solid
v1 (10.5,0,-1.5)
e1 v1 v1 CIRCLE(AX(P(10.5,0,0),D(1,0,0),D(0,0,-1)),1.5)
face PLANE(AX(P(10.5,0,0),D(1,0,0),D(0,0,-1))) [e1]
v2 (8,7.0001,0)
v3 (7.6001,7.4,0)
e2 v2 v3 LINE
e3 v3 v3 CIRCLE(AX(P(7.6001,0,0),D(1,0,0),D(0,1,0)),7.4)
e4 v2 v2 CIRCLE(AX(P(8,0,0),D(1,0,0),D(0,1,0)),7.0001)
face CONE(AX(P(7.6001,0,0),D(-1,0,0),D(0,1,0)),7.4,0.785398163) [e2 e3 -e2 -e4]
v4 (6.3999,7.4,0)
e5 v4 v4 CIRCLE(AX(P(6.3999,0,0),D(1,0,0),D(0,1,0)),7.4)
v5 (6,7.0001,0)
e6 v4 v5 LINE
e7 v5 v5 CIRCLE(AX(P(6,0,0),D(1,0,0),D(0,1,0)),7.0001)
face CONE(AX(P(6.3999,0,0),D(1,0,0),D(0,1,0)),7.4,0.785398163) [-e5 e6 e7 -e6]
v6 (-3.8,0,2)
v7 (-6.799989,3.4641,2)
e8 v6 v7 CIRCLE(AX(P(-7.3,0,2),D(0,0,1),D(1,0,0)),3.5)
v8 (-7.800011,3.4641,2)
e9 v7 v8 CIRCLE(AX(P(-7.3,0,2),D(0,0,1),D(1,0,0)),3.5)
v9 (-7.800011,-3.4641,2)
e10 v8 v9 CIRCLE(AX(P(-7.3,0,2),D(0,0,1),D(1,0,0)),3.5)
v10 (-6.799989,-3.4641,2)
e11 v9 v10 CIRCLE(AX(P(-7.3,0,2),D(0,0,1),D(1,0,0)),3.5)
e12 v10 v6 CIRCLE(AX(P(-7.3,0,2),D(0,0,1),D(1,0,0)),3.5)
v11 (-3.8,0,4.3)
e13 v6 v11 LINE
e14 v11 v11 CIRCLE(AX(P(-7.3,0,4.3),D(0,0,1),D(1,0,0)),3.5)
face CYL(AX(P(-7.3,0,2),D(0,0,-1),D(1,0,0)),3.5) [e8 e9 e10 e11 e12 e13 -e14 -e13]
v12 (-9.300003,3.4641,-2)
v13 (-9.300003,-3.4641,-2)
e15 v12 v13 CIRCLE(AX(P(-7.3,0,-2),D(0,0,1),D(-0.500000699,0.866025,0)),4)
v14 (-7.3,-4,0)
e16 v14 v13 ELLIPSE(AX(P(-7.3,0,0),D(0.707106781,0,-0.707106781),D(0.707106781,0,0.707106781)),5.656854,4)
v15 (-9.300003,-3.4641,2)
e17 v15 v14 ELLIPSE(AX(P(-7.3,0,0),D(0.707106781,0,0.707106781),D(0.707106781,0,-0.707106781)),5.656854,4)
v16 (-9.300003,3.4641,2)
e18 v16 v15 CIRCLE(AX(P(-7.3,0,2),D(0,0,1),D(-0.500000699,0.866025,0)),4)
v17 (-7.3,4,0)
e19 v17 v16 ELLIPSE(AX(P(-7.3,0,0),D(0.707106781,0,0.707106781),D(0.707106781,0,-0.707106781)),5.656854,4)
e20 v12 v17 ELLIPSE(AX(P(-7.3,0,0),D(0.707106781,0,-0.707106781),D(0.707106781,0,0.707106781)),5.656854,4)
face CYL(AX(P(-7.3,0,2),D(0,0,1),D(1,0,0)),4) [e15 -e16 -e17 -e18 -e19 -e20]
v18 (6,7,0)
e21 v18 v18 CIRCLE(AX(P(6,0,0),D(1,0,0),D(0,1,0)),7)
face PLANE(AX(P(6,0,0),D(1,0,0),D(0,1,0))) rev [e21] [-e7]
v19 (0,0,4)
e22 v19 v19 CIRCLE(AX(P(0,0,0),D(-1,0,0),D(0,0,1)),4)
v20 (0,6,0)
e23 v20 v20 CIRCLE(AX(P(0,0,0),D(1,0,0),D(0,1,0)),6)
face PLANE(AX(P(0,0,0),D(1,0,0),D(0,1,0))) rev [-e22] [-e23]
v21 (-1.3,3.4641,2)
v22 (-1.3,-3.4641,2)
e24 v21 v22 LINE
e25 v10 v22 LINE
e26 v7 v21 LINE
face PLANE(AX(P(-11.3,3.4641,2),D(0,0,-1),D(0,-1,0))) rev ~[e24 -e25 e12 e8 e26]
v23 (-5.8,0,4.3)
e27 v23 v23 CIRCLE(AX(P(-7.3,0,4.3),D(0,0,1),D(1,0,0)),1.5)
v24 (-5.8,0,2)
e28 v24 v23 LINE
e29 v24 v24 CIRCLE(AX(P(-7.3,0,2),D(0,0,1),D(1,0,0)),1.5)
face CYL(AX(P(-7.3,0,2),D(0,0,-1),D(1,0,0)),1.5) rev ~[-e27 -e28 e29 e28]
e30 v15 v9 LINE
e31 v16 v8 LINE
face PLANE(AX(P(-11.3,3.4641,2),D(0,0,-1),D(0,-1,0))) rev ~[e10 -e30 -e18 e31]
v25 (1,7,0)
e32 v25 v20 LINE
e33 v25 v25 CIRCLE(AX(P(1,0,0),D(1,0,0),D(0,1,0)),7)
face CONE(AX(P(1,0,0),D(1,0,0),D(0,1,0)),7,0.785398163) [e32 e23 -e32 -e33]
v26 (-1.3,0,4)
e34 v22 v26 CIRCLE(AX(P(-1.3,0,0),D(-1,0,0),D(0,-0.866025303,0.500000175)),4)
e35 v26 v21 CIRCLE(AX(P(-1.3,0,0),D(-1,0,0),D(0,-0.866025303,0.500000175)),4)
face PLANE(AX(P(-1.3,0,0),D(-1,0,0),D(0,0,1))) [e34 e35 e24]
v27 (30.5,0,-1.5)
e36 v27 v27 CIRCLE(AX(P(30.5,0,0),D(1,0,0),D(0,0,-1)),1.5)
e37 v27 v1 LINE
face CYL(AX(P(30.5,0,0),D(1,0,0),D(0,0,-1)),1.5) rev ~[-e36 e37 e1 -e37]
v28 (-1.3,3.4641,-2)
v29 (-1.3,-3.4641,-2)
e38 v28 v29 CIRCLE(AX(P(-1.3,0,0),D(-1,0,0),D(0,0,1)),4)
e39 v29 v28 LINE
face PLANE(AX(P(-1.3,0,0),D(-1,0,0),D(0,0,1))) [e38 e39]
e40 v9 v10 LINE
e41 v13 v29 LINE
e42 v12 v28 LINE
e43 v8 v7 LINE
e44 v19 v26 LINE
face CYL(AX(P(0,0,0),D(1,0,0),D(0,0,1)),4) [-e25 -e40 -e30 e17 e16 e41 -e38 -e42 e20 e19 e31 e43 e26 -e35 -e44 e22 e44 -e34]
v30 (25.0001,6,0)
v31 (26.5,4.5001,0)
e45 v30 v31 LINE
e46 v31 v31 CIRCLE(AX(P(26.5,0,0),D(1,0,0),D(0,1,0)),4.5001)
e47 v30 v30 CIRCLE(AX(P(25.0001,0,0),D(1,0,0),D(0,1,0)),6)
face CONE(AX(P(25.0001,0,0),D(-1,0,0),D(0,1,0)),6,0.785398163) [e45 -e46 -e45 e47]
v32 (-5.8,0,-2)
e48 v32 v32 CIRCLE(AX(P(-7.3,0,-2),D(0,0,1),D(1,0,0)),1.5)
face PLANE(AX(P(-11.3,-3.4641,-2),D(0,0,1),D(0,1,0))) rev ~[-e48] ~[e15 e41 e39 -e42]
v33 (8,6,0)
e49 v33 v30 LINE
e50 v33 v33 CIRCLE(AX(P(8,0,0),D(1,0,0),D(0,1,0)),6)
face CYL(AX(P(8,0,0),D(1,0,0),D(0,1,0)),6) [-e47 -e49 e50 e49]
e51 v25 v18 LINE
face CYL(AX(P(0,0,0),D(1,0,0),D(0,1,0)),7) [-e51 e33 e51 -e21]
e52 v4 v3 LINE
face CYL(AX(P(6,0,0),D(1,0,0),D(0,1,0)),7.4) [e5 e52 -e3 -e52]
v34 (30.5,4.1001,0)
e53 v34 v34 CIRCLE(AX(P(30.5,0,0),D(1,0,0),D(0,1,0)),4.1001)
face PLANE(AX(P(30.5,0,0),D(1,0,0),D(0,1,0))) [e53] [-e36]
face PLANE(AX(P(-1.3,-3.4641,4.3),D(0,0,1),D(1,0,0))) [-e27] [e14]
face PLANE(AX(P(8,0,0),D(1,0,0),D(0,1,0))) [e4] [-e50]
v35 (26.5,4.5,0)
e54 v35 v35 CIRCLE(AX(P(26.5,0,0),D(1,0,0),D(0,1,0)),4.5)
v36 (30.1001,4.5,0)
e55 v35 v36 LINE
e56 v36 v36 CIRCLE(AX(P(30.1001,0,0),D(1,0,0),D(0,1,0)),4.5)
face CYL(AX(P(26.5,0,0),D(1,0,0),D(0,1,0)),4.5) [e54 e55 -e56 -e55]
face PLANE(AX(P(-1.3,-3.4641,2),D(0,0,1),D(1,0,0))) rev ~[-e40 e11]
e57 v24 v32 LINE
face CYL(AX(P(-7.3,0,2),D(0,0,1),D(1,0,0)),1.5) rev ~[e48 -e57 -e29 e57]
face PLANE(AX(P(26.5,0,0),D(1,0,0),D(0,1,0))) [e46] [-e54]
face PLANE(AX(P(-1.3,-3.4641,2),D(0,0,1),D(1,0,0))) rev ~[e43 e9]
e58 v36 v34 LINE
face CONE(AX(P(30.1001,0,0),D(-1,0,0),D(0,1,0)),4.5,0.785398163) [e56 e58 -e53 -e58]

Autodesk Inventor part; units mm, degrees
ref_plane "YZ Plane" through (0, 0, 0) normal (1, 0, 0) x (0, 1, 0)
ref_plane "XZ Plane" through (0, 0, 0) normal (0, 1, 0) x (-1, 0, 0)
ref_plane "XY Plane" through (0, 0, 0) normal (0, 0, 1) x (1, 0, 0)
sketch "Sketch2" plane through (0, 0, 0) normal (0, 0, 1) x (1, 0, 0)
  line L0 (-6.1, 0) -> (36.6, 0) construction
  line L1 (0, -1.48) -> (0, 8.88) construction
  line L2 (0, 0) -> (0, 7)
  line L3 (0, 7) -> (6, 7)
  line L4 (6, 7) -> (6, 7.4)
  line L5 (6, 7.4) -> (8, 7.4)
  line L6 (8, 7.4) -> (8, 6)
  line L7 (8, 6) -> (26.5, 6)
  line L8 (26.5, 6) -> (26.5, 4.5)
  line L9 (26.5, 4.5) -> (30.5, 4.5)
  line L10 (30.5, 4.5) -> (30.5, 0)
  line L11 (0, 0) -> (30.5, 0)
  dimension "d0" = 14
  dimension "d1" = 30.5
  dimension "d2" = 8
  dimension "d3" = 14.8
  dimension "d4" = 9
  dimension "d5" = 4
  dimension "d6" = 12
  dimension "d7" = 6
revolve "Revolution1" add sketch "Sketch2" angle 360 about axis through (-10, 0, 0) along (1, 0, 0)
thread "Thread1" size "M12x1" class "6g" standard "ISO Metric profile" length 110
chamfer "Chamfer1" distance 1.5 angle 45 1 edges at (26.5, -6, 0)
chamfer "Chamfer2" distance 0.4 angle 45 3 edges at (6, -7.4, 0) (8, -7.4, 0) (30.5, -4.5, 0)
chamfer "Chamfer3" distance 1 angle 45 1 edges at (0, -7, 0)
sketch "Sketch3" plane through (0, 0, 0) normal (-1, 0, 0) x (0, 0, 1)
  circle A0 centre (0, 0) radius 4
  dimension "d20" = 8
extrude "Extrusion1" add sketch "Sketch3" along normal blind 11.3
sketch "Sketch4" plane through (-11.3, 0, 0) normal (-1, 0, 0) x (0, 0, 1)
  line L0 (0, -10.36) -> (0, 10.36) construction
  circle A0 centre (0, 0) radius 4 construction
  circle A1 centre (0, 0) radius 4
  line L1 (-2, -3.4641) -> (-2, 3.4641)
  line L2 (2, 3.4641) -> (2, -3.4641)
  dimension "d23" = 4
extrude "Extrusion2" cut sketch "Sketch4" against normal blind 10 contours A1 L2 | L1 A1
sketch "Sketch5" plane through (-11.3, -3.4641, 2) normal (0, 0, 1) x (1, 0, 0)
  line L0 (-8.36, 3.4641) -> (50.16, 3.4641) construction
  circle A0 centre (4, 3.4641) radius 4
  line L1 (0, 0) -> (0, 6.9282) construction
  line L2 (10, 0) -> (0, 0) construction
  line L3 (10, 0) -> (10, 6.9282) construction
  line L4 (0, 6.9282) -> (10, 6.9282) construction
  line L5 (0, 0) -> (0, 6.9282) construction
  line L6 (11.3, 7.4641) -> (0, 7.4641) construction
  line L7 (11.3, -0.5359) -> (0, -0.5359) construction
  line L8 (4, -0.5359) -> (0, -0.5359)
  line L9 (0, -0.5359) -> (0, 7.4641)
  line L10 (0, 7.4641) -> (4, 7.4641)
  point P0 (11.3, 3.4641)
  point P1 (0, 3.4641)
  dimension "d26" = 8
extrude "Extrusion3" cut sketch "Sketch5" against normal through all contours A0 L9 L10 | L8 L9 A0
sketch "Sketch6" plane through (-1.3, -3.4641, 2) normal (0, 0, 1) x (1, 0, 0)
  arc A0 (-8, 6.9282) -> (-8, 0) centre (-6, 3.4641) ccw construction
  circle A1 centre (-6, 3.4641) radius 1.5
  point P0 (1.3, 3.4641)
  dimension "d29" = 3
extrude "Extrusion4" cut sketch "Sketch6" against normal through all
sketch "Sketch7" plane through (-1.3, -3.4641, 2) normal (0, 0, 1) x (1, 0, 0)
  circle A0 centre (-6, 3.4641) radius 1.5 construction
  circle A1 centre (-6, 3.4641) radius 1.5
  circle A2 centre (-6, 3.4641) radius 3.5
  point P0 (1.3, 3.4641)
  dimension "d32" = 7
extrude "Extrusion5" add sketch "Sketch7" along normal blind 2.3
sketch "Sketch8" plane through (30.5, 0, 0) normal (1, 0, 0) x (0, 0, -1)
  circle A0 centre (0, 0) radius 1.5
  dimension "d35" = 3
extrude "Extrusion6" cut sketch "Sketch8" against normal blind 20
properties part number "Corps" material "Aluminum 6061"
